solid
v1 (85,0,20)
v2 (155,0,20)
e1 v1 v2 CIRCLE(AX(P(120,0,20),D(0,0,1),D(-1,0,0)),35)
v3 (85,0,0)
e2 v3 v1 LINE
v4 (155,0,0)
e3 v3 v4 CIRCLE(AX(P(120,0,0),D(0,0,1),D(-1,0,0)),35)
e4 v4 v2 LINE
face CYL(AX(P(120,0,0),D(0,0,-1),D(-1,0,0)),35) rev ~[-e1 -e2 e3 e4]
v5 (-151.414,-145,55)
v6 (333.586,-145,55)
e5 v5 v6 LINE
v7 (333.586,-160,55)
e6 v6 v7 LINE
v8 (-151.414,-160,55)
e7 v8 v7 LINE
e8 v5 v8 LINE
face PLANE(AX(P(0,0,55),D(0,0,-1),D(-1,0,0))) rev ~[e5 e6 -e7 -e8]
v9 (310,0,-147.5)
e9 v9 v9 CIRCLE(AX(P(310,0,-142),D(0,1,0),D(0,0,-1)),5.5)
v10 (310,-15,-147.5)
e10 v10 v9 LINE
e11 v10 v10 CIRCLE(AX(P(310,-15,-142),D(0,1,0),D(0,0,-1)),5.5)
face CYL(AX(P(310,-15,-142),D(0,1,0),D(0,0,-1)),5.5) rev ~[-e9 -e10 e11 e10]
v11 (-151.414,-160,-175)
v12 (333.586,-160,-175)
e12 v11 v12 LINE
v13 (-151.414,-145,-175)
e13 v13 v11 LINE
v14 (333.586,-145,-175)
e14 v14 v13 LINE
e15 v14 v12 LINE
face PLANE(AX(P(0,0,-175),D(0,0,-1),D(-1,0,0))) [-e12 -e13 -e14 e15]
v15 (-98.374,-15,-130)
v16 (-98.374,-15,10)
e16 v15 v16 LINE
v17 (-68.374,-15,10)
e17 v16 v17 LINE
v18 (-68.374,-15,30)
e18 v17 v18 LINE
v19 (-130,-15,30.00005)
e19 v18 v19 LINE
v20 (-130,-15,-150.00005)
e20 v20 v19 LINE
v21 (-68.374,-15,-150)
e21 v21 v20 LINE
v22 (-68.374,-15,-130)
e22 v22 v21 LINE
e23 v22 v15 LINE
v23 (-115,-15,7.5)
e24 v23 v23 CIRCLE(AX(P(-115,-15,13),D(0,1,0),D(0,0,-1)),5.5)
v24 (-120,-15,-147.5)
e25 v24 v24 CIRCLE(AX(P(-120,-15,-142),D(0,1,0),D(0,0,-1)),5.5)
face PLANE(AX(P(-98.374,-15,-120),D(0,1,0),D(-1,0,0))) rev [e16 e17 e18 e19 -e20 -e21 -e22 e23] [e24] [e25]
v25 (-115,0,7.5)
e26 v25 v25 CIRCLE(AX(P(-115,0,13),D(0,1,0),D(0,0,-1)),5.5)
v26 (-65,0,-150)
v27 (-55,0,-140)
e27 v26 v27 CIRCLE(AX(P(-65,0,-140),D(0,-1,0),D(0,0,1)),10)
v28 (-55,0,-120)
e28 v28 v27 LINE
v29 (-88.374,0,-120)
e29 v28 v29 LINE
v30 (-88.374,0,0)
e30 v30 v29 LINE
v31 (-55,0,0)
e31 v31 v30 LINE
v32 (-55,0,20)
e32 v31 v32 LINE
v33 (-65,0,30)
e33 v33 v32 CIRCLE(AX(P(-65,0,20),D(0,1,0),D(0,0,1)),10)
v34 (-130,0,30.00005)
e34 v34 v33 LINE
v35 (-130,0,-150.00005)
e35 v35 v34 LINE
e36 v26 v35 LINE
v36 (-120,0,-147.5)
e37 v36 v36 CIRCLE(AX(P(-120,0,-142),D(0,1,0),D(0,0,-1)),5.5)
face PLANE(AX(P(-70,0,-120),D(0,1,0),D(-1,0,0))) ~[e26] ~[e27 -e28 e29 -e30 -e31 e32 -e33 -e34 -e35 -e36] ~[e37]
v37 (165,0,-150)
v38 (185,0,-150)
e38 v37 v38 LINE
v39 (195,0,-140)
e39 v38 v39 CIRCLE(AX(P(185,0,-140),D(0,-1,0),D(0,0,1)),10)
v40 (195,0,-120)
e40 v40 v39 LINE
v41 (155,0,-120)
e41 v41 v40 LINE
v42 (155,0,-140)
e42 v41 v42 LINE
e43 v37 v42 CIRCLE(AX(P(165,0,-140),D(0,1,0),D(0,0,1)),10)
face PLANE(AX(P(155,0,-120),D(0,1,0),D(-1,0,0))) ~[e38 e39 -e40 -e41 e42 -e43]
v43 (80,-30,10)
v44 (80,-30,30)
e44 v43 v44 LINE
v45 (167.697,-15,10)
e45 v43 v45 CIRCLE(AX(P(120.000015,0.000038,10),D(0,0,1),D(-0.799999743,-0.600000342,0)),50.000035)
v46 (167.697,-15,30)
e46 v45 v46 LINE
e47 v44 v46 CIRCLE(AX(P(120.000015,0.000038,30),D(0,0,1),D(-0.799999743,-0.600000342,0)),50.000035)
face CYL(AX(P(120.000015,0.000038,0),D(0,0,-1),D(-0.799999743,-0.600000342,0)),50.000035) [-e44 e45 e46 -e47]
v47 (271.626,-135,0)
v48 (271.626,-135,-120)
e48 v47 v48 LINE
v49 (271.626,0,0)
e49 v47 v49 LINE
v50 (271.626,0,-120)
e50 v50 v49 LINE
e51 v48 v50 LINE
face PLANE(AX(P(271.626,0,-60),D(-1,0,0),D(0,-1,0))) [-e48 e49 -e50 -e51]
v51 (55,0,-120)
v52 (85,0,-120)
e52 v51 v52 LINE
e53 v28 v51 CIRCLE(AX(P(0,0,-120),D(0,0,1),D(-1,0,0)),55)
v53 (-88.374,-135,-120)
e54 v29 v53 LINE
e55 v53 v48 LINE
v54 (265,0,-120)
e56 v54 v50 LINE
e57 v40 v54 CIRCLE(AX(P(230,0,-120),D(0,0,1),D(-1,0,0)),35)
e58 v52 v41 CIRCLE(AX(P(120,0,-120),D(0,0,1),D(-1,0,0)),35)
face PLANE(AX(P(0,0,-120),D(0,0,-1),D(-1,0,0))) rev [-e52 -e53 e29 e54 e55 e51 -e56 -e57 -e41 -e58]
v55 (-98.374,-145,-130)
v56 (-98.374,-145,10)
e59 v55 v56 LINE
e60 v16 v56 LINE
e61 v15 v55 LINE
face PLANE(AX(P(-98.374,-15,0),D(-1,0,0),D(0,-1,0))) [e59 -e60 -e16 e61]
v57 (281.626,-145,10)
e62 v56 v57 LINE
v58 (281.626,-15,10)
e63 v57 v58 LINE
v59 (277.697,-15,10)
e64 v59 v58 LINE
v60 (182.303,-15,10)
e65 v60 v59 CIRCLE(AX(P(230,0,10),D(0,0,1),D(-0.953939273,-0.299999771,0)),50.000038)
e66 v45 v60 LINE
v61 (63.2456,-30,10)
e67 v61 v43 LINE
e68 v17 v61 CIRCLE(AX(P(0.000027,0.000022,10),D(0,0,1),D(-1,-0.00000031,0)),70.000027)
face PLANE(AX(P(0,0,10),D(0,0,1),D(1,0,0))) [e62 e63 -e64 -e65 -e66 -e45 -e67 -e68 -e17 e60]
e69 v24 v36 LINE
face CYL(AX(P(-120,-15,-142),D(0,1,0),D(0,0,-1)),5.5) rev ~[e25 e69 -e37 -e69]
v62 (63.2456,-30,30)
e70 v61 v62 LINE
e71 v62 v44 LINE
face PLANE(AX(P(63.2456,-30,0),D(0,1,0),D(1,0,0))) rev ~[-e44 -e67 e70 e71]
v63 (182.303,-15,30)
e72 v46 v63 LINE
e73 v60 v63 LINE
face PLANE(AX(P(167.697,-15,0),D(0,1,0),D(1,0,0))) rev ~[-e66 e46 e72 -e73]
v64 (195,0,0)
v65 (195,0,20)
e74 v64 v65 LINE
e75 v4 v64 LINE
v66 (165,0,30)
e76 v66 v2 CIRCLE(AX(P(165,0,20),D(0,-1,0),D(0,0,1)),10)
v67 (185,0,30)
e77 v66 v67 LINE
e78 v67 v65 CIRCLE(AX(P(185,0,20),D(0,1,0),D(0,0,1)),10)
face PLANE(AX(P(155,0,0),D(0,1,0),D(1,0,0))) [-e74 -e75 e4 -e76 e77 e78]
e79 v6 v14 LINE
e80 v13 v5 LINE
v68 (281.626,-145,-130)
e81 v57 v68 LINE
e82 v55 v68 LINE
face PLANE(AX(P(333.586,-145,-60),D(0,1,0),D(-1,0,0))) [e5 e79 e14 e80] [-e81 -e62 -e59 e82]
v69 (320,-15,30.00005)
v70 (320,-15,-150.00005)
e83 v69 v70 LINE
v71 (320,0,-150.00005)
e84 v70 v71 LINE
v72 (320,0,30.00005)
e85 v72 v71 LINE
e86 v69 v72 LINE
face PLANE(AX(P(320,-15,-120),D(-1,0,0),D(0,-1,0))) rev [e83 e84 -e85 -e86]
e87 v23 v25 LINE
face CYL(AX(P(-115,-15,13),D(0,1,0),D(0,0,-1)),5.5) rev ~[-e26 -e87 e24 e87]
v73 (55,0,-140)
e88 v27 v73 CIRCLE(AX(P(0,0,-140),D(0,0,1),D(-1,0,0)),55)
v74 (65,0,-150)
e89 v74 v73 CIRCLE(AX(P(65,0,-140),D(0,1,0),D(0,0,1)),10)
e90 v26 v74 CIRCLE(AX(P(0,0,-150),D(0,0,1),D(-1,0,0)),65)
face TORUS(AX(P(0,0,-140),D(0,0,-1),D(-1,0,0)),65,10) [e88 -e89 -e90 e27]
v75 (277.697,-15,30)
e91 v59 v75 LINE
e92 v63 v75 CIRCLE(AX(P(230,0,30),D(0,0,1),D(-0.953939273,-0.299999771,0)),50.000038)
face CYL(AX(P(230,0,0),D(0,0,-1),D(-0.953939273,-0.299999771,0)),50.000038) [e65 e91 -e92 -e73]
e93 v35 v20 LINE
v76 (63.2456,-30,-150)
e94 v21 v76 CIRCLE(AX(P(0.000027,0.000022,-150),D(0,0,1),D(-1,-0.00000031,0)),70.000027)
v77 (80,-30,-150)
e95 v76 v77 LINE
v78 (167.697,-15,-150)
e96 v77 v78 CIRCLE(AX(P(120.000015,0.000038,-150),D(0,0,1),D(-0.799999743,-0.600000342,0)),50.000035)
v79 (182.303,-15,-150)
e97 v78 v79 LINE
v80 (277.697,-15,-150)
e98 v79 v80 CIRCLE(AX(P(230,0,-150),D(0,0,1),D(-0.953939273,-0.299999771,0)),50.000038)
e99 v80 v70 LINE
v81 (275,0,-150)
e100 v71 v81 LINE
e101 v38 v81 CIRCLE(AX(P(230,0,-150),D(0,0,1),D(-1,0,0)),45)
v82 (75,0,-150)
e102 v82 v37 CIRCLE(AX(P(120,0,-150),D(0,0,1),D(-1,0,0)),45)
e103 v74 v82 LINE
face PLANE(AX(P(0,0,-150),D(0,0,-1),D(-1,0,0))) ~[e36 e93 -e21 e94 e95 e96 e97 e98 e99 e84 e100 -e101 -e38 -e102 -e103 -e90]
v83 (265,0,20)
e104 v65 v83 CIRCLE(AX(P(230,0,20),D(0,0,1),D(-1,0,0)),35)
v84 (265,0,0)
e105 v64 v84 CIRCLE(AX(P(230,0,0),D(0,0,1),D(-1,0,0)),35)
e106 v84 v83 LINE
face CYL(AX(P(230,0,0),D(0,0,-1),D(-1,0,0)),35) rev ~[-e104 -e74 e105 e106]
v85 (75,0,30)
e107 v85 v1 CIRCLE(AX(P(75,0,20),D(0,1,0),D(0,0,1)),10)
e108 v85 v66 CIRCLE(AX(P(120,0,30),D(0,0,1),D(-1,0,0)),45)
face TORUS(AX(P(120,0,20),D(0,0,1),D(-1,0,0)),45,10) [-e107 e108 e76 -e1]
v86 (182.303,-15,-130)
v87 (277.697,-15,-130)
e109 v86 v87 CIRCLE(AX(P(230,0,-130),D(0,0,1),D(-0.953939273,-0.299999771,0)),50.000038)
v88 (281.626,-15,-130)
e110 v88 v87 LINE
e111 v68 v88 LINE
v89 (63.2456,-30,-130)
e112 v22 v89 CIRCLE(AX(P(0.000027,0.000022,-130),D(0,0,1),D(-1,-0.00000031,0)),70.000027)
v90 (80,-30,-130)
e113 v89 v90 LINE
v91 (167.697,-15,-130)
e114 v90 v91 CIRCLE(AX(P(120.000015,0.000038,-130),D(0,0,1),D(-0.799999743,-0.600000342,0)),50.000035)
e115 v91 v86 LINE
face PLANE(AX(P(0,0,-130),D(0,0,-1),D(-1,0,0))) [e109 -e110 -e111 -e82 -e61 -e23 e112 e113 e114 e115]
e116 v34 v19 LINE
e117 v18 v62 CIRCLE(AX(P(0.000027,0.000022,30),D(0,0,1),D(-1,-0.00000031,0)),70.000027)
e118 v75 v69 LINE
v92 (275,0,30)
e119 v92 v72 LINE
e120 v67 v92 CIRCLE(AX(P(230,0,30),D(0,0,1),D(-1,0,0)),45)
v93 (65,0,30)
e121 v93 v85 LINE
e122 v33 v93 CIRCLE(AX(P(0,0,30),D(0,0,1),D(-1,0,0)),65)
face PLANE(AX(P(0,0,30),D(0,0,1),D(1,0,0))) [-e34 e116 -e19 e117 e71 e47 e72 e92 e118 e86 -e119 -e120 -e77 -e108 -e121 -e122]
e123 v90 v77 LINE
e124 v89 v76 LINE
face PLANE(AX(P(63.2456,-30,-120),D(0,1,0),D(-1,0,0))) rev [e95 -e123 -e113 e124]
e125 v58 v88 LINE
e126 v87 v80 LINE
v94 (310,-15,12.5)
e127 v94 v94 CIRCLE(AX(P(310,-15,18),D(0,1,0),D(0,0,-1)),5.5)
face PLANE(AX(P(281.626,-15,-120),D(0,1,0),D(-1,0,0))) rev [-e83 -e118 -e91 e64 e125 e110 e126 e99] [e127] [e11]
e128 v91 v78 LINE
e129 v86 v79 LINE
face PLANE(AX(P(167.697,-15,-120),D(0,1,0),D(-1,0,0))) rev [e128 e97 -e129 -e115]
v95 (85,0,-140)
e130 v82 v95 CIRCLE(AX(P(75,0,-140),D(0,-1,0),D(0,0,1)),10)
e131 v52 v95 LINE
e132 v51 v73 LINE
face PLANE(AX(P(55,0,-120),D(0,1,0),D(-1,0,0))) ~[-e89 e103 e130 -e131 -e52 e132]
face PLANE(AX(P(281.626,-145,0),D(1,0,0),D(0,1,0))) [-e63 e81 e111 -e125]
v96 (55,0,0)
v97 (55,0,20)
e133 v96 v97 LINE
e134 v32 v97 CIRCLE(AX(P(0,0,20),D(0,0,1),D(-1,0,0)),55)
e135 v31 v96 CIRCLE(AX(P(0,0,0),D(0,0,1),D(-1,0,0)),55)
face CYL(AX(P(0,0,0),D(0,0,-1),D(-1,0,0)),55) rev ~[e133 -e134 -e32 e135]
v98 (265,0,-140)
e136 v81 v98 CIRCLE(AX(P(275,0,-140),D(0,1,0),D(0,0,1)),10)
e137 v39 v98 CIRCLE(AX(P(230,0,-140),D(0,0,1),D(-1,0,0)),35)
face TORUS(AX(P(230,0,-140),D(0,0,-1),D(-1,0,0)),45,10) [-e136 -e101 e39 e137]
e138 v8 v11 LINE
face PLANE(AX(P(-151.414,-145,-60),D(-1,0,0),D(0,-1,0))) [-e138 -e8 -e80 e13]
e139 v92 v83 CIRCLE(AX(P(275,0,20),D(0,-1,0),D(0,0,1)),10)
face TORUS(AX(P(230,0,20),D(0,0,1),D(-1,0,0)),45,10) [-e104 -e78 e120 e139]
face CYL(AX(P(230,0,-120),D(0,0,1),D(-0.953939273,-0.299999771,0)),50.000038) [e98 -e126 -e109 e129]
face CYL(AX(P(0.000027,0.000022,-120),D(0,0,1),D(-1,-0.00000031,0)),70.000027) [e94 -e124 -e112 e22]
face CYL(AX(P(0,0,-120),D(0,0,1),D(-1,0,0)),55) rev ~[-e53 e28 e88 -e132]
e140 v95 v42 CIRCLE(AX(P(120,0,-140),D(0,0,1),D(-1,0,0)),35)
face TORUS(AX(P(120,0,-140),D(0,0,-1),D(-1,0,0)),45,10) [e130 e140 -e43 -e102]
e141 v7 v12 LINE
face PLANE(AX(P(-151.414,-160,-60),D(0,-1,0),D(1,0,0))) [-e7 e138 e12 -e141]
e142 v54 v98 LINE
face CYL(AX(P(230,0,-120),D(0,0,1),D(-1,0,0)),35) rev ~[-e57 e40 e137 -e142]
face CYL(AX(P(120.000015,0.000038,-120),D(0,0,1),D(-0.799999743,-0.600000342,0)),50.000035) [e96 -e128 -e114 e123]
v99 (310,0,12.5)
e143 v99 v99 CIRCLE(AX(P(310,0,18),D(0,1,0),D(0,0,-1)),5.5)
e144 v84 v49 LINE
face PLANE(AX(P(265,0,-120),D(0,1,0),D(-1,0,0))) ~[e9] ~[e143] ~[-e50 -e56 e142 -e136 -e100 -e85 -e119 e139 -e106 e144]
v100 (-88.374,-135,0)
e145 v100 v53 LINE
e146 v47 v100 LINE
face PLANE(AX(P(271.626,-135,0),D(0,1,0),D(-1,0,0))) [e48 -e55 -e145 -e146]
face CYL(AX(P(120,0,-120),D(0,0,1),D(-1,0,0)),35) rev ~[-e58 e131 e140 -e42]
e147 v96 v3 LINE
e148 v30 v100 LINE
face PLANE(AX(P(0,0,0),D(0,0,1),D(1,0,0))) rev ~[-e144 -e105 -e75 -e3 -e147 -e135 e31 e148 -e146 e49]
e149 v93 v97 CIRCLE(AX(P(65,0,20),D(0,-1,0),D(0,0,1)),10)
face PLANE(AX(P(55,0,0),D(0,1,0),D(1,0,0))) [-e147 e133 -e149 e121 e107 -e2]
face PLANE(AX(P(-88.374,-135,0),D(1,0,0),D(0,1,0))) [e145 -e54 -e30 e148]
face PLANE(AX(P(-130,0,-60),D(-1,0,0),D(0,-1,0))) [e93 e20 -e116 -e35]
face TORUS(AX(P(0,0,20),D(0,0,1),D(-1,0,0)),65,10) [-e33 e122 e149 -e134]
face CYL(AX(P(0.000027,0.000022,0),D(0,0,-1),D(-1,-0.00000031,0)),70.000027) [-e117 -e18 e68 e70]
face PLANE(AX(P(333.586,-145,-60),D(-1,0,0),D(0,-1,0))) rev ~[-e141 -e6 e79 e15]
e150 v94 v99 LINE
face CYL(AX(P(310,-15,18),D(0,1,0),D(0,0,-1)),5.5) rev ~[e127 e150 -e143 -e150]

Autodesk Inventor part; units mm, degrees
ref_plane "YZ Plane" through (0, 0, 0) normal (1, 0, 0) x (0, 1, 0)
ref_plane "XZ Plane" through (0, 0, 0) normal (0, 1, 0) x (-1, 0, 0)
sketch "Sketch1" plane through (0, 0, 0) normal (0, 0, 1) x (1, 0, 0)
  arc A0 (-55, 0) -> (55, 0) centre (0, 0) ccw
  arc A1 (-70, 0) -> (63.2456, -30) centre (0, 0) ccw
  arc A2 (85, 0) -> (155, 0) centre (120, 0) ccw
  arc A3 (80, -30) -> (167.697, -15) centre (120, 0) ccw
  arc A4 (195, 0) -> (265, 0) centre (230, 0) ccw
  arc A5 (182.303, -15) -> (277.697, -15) centre (230, 0) ccw
  line L0 (-130, 0) -> (-130, -15)
  line L1 (320, -15) -> (320, 0)
  line L2 (-130, -15) -> (-68.374, -15)
  line L3 (-130, 0) -> (-55, 0)
  line L4 (63.2456, -30) -> (80, -30)
  line L5 (167.697, -15) -> (182.303, -15)
  line L6 (277.697, -15) -> (320, -15)
  line L7 (265, 0) -> (320, 0)
  line L8 (55, 0) -> (85, 0)
  line L9 (155, 0) -> (195, 0)
  line L10 (-98.374, -15) -> (-98.374, -145)
  line L11 (-98.374, -145) -> (281.626, -145)
  line L12 (281.626, -145) -> (281.626, -15)
  dimension "d0" = 110
  dimension "d1" = 140
  dimension "d2" = 70
  dimension "d3" = 100
  dimension "d4" = 70
  dimension "d5" = 100
  dimension "d10" = 15
  dimension "d12" = 130
  dimension "d70" = 120
  dimension "d71" = 110
  dimension "d72" = 380
  dimension "d75" = 130
  dimension "d76" = 30
  dimension "d77" = 15
  dimension "d92" = 450
extrude "Extrusion1" add sketch "Sketch1" along normal blind 30 contours A0 L8 A2 L9 A4 L7 L1 L6 A5 L5 A3 L4 A1 L3 | A1 L2 L0 L3
extrude "Extrusion2" add sketch "Sketch1" along normal blind 10 contours A1 L4 A3 L5 A5 L6 L12 L11 L10 L2
sketch "Sketch2" plane through (0, 0, 0) normal (0, 0, -1) x (-1, 0, 0)
  line L0 (-281.626, -145) -> (-281.626, -15) projected
  line L1 (98.374, -145) -> (-281.626, -145) projected
  line L2 (98.374, -15) -> (98.374, -145) projected
  line L3 (-271.626, -15) -> (-271.626, -135)
  line L4 (-271.626, -135) -> (88.374, -135)
  line L5 (88.374, -135) -> (88.374, -15)
  line L6 (-281.626, -15) -> (-320, -15) projected
  line L7 (130, -15) -> (98.374, -15) projected
  line L8 (-281.626, -15) -> (-271.626, -15)
  line L9 (88.374, -15) -> (98.374, -15)
  point P0 (0, 0)
  dimension "d19" = 10
extrude "Extrusion3" add sketch "Sketch2" along normal blind 130
ref_plane "Work Plane1" through (0, 0, -60) normal (0, 0, -1) x (-1, 0, 0)
mirror "Mirror1" about plane through (0, 0, -60) normal (0, 0, -1) of "Extrusion1", "Extrusion2"
sketch "Sketch3" plane through (0, 0, -60) normal (0, 0, -1) x (-1, 0, 0)
  line L0 (88.374, -135) -> (88.374, -15) projected
  line L1 (130, 0) -> (130, -15) projected
  line L2 (88.374, -15) -> (130, -15)
  line L3 (130, -15) -> (130, 0)
  line L4 (130, 0) -> (88.374, 0)
  line L5 (88.374, 0) -> (88.374, -15)
  line L6 (-271.626, -15) -> (-271.626, -135) projected
  line L7 (-320, 0) -> (-265, 0) projected
  line L8 (-271.626, -15) -> (-320, -15)
  line L9 (-320, -15) -> (-320, 0)
  line L10 (-320, 0) -> (-271.626, 0)
  line L11 (-271.626, 0) -> (-271.626, -15)
  point P0 (0, 0)
  point P1 (-271.626, 0)
extrude "Extrusion4" add sketch "Sketch3" along normal through all both and the other way through all
sketch "Sketch4" plane through (0, 0, -60) normal (0, 0, -1) x (-1, 0, 0)
  line L0 (-281.626, -15) -> (-281.626, -145) projected
  line L1 (-333.586, -145) -> (151.414, -145)
  line L2 (151.414, -145) -> (151.414, -160)
  line L3 (151.414, -160) -> (-333.586, -160)
  line L4 (-333.586, -145) -> (-333.586, -160)
  point P0 (0, 0)
  dimension "d29" = 51.96
  dimension "d30" = 485
  dimension "d31" = 15
extrude "Extrusion5" add sketch "Sketch4" along normal mid plane 230
fillet "Fillet1" radius 10 6 edges at (0, -55, 30) (120, -35, 30) (230, -35, 30) (230, -35, -150) (120, -35, -150) (0, -55, -150)
sketch "Sketch9" plane through (-130, -15, 30) normal (0, -1, 0) x (1, 0, 0)
  point P0 (15, -17)
hole "Hole5" at (-115, -15, 13) direction (0, 1, 0) diameter 11 depth 15
sketch "Sketch10" plane through (-130, -15, 30) normal (0, -1, 0) x (1, 0, 0)
  point P0 (10, -172)
hole "Hole6" at (-120, -15, -142) direction (0, 1, 0) diameter 11 depth 15
sketch "Sketch11" plane through (277.697, -15, 30) normal (0, -1, 0) x (1, 0, 0)
  point P0 (32.303, -172)
hole "Hole7" at (310, -15, -142) direction (0, 1, 0) diameter 11 depth 15
sketch "Sketch12" plane through (277.697, -15, 30) normal (0, -1, 0) x (1, 0, 0)
  point P0 (32.303, -12)
hole "Hole8" at (310, -15, 18) direction (0, 1, 0) diameter 11 depth 15
